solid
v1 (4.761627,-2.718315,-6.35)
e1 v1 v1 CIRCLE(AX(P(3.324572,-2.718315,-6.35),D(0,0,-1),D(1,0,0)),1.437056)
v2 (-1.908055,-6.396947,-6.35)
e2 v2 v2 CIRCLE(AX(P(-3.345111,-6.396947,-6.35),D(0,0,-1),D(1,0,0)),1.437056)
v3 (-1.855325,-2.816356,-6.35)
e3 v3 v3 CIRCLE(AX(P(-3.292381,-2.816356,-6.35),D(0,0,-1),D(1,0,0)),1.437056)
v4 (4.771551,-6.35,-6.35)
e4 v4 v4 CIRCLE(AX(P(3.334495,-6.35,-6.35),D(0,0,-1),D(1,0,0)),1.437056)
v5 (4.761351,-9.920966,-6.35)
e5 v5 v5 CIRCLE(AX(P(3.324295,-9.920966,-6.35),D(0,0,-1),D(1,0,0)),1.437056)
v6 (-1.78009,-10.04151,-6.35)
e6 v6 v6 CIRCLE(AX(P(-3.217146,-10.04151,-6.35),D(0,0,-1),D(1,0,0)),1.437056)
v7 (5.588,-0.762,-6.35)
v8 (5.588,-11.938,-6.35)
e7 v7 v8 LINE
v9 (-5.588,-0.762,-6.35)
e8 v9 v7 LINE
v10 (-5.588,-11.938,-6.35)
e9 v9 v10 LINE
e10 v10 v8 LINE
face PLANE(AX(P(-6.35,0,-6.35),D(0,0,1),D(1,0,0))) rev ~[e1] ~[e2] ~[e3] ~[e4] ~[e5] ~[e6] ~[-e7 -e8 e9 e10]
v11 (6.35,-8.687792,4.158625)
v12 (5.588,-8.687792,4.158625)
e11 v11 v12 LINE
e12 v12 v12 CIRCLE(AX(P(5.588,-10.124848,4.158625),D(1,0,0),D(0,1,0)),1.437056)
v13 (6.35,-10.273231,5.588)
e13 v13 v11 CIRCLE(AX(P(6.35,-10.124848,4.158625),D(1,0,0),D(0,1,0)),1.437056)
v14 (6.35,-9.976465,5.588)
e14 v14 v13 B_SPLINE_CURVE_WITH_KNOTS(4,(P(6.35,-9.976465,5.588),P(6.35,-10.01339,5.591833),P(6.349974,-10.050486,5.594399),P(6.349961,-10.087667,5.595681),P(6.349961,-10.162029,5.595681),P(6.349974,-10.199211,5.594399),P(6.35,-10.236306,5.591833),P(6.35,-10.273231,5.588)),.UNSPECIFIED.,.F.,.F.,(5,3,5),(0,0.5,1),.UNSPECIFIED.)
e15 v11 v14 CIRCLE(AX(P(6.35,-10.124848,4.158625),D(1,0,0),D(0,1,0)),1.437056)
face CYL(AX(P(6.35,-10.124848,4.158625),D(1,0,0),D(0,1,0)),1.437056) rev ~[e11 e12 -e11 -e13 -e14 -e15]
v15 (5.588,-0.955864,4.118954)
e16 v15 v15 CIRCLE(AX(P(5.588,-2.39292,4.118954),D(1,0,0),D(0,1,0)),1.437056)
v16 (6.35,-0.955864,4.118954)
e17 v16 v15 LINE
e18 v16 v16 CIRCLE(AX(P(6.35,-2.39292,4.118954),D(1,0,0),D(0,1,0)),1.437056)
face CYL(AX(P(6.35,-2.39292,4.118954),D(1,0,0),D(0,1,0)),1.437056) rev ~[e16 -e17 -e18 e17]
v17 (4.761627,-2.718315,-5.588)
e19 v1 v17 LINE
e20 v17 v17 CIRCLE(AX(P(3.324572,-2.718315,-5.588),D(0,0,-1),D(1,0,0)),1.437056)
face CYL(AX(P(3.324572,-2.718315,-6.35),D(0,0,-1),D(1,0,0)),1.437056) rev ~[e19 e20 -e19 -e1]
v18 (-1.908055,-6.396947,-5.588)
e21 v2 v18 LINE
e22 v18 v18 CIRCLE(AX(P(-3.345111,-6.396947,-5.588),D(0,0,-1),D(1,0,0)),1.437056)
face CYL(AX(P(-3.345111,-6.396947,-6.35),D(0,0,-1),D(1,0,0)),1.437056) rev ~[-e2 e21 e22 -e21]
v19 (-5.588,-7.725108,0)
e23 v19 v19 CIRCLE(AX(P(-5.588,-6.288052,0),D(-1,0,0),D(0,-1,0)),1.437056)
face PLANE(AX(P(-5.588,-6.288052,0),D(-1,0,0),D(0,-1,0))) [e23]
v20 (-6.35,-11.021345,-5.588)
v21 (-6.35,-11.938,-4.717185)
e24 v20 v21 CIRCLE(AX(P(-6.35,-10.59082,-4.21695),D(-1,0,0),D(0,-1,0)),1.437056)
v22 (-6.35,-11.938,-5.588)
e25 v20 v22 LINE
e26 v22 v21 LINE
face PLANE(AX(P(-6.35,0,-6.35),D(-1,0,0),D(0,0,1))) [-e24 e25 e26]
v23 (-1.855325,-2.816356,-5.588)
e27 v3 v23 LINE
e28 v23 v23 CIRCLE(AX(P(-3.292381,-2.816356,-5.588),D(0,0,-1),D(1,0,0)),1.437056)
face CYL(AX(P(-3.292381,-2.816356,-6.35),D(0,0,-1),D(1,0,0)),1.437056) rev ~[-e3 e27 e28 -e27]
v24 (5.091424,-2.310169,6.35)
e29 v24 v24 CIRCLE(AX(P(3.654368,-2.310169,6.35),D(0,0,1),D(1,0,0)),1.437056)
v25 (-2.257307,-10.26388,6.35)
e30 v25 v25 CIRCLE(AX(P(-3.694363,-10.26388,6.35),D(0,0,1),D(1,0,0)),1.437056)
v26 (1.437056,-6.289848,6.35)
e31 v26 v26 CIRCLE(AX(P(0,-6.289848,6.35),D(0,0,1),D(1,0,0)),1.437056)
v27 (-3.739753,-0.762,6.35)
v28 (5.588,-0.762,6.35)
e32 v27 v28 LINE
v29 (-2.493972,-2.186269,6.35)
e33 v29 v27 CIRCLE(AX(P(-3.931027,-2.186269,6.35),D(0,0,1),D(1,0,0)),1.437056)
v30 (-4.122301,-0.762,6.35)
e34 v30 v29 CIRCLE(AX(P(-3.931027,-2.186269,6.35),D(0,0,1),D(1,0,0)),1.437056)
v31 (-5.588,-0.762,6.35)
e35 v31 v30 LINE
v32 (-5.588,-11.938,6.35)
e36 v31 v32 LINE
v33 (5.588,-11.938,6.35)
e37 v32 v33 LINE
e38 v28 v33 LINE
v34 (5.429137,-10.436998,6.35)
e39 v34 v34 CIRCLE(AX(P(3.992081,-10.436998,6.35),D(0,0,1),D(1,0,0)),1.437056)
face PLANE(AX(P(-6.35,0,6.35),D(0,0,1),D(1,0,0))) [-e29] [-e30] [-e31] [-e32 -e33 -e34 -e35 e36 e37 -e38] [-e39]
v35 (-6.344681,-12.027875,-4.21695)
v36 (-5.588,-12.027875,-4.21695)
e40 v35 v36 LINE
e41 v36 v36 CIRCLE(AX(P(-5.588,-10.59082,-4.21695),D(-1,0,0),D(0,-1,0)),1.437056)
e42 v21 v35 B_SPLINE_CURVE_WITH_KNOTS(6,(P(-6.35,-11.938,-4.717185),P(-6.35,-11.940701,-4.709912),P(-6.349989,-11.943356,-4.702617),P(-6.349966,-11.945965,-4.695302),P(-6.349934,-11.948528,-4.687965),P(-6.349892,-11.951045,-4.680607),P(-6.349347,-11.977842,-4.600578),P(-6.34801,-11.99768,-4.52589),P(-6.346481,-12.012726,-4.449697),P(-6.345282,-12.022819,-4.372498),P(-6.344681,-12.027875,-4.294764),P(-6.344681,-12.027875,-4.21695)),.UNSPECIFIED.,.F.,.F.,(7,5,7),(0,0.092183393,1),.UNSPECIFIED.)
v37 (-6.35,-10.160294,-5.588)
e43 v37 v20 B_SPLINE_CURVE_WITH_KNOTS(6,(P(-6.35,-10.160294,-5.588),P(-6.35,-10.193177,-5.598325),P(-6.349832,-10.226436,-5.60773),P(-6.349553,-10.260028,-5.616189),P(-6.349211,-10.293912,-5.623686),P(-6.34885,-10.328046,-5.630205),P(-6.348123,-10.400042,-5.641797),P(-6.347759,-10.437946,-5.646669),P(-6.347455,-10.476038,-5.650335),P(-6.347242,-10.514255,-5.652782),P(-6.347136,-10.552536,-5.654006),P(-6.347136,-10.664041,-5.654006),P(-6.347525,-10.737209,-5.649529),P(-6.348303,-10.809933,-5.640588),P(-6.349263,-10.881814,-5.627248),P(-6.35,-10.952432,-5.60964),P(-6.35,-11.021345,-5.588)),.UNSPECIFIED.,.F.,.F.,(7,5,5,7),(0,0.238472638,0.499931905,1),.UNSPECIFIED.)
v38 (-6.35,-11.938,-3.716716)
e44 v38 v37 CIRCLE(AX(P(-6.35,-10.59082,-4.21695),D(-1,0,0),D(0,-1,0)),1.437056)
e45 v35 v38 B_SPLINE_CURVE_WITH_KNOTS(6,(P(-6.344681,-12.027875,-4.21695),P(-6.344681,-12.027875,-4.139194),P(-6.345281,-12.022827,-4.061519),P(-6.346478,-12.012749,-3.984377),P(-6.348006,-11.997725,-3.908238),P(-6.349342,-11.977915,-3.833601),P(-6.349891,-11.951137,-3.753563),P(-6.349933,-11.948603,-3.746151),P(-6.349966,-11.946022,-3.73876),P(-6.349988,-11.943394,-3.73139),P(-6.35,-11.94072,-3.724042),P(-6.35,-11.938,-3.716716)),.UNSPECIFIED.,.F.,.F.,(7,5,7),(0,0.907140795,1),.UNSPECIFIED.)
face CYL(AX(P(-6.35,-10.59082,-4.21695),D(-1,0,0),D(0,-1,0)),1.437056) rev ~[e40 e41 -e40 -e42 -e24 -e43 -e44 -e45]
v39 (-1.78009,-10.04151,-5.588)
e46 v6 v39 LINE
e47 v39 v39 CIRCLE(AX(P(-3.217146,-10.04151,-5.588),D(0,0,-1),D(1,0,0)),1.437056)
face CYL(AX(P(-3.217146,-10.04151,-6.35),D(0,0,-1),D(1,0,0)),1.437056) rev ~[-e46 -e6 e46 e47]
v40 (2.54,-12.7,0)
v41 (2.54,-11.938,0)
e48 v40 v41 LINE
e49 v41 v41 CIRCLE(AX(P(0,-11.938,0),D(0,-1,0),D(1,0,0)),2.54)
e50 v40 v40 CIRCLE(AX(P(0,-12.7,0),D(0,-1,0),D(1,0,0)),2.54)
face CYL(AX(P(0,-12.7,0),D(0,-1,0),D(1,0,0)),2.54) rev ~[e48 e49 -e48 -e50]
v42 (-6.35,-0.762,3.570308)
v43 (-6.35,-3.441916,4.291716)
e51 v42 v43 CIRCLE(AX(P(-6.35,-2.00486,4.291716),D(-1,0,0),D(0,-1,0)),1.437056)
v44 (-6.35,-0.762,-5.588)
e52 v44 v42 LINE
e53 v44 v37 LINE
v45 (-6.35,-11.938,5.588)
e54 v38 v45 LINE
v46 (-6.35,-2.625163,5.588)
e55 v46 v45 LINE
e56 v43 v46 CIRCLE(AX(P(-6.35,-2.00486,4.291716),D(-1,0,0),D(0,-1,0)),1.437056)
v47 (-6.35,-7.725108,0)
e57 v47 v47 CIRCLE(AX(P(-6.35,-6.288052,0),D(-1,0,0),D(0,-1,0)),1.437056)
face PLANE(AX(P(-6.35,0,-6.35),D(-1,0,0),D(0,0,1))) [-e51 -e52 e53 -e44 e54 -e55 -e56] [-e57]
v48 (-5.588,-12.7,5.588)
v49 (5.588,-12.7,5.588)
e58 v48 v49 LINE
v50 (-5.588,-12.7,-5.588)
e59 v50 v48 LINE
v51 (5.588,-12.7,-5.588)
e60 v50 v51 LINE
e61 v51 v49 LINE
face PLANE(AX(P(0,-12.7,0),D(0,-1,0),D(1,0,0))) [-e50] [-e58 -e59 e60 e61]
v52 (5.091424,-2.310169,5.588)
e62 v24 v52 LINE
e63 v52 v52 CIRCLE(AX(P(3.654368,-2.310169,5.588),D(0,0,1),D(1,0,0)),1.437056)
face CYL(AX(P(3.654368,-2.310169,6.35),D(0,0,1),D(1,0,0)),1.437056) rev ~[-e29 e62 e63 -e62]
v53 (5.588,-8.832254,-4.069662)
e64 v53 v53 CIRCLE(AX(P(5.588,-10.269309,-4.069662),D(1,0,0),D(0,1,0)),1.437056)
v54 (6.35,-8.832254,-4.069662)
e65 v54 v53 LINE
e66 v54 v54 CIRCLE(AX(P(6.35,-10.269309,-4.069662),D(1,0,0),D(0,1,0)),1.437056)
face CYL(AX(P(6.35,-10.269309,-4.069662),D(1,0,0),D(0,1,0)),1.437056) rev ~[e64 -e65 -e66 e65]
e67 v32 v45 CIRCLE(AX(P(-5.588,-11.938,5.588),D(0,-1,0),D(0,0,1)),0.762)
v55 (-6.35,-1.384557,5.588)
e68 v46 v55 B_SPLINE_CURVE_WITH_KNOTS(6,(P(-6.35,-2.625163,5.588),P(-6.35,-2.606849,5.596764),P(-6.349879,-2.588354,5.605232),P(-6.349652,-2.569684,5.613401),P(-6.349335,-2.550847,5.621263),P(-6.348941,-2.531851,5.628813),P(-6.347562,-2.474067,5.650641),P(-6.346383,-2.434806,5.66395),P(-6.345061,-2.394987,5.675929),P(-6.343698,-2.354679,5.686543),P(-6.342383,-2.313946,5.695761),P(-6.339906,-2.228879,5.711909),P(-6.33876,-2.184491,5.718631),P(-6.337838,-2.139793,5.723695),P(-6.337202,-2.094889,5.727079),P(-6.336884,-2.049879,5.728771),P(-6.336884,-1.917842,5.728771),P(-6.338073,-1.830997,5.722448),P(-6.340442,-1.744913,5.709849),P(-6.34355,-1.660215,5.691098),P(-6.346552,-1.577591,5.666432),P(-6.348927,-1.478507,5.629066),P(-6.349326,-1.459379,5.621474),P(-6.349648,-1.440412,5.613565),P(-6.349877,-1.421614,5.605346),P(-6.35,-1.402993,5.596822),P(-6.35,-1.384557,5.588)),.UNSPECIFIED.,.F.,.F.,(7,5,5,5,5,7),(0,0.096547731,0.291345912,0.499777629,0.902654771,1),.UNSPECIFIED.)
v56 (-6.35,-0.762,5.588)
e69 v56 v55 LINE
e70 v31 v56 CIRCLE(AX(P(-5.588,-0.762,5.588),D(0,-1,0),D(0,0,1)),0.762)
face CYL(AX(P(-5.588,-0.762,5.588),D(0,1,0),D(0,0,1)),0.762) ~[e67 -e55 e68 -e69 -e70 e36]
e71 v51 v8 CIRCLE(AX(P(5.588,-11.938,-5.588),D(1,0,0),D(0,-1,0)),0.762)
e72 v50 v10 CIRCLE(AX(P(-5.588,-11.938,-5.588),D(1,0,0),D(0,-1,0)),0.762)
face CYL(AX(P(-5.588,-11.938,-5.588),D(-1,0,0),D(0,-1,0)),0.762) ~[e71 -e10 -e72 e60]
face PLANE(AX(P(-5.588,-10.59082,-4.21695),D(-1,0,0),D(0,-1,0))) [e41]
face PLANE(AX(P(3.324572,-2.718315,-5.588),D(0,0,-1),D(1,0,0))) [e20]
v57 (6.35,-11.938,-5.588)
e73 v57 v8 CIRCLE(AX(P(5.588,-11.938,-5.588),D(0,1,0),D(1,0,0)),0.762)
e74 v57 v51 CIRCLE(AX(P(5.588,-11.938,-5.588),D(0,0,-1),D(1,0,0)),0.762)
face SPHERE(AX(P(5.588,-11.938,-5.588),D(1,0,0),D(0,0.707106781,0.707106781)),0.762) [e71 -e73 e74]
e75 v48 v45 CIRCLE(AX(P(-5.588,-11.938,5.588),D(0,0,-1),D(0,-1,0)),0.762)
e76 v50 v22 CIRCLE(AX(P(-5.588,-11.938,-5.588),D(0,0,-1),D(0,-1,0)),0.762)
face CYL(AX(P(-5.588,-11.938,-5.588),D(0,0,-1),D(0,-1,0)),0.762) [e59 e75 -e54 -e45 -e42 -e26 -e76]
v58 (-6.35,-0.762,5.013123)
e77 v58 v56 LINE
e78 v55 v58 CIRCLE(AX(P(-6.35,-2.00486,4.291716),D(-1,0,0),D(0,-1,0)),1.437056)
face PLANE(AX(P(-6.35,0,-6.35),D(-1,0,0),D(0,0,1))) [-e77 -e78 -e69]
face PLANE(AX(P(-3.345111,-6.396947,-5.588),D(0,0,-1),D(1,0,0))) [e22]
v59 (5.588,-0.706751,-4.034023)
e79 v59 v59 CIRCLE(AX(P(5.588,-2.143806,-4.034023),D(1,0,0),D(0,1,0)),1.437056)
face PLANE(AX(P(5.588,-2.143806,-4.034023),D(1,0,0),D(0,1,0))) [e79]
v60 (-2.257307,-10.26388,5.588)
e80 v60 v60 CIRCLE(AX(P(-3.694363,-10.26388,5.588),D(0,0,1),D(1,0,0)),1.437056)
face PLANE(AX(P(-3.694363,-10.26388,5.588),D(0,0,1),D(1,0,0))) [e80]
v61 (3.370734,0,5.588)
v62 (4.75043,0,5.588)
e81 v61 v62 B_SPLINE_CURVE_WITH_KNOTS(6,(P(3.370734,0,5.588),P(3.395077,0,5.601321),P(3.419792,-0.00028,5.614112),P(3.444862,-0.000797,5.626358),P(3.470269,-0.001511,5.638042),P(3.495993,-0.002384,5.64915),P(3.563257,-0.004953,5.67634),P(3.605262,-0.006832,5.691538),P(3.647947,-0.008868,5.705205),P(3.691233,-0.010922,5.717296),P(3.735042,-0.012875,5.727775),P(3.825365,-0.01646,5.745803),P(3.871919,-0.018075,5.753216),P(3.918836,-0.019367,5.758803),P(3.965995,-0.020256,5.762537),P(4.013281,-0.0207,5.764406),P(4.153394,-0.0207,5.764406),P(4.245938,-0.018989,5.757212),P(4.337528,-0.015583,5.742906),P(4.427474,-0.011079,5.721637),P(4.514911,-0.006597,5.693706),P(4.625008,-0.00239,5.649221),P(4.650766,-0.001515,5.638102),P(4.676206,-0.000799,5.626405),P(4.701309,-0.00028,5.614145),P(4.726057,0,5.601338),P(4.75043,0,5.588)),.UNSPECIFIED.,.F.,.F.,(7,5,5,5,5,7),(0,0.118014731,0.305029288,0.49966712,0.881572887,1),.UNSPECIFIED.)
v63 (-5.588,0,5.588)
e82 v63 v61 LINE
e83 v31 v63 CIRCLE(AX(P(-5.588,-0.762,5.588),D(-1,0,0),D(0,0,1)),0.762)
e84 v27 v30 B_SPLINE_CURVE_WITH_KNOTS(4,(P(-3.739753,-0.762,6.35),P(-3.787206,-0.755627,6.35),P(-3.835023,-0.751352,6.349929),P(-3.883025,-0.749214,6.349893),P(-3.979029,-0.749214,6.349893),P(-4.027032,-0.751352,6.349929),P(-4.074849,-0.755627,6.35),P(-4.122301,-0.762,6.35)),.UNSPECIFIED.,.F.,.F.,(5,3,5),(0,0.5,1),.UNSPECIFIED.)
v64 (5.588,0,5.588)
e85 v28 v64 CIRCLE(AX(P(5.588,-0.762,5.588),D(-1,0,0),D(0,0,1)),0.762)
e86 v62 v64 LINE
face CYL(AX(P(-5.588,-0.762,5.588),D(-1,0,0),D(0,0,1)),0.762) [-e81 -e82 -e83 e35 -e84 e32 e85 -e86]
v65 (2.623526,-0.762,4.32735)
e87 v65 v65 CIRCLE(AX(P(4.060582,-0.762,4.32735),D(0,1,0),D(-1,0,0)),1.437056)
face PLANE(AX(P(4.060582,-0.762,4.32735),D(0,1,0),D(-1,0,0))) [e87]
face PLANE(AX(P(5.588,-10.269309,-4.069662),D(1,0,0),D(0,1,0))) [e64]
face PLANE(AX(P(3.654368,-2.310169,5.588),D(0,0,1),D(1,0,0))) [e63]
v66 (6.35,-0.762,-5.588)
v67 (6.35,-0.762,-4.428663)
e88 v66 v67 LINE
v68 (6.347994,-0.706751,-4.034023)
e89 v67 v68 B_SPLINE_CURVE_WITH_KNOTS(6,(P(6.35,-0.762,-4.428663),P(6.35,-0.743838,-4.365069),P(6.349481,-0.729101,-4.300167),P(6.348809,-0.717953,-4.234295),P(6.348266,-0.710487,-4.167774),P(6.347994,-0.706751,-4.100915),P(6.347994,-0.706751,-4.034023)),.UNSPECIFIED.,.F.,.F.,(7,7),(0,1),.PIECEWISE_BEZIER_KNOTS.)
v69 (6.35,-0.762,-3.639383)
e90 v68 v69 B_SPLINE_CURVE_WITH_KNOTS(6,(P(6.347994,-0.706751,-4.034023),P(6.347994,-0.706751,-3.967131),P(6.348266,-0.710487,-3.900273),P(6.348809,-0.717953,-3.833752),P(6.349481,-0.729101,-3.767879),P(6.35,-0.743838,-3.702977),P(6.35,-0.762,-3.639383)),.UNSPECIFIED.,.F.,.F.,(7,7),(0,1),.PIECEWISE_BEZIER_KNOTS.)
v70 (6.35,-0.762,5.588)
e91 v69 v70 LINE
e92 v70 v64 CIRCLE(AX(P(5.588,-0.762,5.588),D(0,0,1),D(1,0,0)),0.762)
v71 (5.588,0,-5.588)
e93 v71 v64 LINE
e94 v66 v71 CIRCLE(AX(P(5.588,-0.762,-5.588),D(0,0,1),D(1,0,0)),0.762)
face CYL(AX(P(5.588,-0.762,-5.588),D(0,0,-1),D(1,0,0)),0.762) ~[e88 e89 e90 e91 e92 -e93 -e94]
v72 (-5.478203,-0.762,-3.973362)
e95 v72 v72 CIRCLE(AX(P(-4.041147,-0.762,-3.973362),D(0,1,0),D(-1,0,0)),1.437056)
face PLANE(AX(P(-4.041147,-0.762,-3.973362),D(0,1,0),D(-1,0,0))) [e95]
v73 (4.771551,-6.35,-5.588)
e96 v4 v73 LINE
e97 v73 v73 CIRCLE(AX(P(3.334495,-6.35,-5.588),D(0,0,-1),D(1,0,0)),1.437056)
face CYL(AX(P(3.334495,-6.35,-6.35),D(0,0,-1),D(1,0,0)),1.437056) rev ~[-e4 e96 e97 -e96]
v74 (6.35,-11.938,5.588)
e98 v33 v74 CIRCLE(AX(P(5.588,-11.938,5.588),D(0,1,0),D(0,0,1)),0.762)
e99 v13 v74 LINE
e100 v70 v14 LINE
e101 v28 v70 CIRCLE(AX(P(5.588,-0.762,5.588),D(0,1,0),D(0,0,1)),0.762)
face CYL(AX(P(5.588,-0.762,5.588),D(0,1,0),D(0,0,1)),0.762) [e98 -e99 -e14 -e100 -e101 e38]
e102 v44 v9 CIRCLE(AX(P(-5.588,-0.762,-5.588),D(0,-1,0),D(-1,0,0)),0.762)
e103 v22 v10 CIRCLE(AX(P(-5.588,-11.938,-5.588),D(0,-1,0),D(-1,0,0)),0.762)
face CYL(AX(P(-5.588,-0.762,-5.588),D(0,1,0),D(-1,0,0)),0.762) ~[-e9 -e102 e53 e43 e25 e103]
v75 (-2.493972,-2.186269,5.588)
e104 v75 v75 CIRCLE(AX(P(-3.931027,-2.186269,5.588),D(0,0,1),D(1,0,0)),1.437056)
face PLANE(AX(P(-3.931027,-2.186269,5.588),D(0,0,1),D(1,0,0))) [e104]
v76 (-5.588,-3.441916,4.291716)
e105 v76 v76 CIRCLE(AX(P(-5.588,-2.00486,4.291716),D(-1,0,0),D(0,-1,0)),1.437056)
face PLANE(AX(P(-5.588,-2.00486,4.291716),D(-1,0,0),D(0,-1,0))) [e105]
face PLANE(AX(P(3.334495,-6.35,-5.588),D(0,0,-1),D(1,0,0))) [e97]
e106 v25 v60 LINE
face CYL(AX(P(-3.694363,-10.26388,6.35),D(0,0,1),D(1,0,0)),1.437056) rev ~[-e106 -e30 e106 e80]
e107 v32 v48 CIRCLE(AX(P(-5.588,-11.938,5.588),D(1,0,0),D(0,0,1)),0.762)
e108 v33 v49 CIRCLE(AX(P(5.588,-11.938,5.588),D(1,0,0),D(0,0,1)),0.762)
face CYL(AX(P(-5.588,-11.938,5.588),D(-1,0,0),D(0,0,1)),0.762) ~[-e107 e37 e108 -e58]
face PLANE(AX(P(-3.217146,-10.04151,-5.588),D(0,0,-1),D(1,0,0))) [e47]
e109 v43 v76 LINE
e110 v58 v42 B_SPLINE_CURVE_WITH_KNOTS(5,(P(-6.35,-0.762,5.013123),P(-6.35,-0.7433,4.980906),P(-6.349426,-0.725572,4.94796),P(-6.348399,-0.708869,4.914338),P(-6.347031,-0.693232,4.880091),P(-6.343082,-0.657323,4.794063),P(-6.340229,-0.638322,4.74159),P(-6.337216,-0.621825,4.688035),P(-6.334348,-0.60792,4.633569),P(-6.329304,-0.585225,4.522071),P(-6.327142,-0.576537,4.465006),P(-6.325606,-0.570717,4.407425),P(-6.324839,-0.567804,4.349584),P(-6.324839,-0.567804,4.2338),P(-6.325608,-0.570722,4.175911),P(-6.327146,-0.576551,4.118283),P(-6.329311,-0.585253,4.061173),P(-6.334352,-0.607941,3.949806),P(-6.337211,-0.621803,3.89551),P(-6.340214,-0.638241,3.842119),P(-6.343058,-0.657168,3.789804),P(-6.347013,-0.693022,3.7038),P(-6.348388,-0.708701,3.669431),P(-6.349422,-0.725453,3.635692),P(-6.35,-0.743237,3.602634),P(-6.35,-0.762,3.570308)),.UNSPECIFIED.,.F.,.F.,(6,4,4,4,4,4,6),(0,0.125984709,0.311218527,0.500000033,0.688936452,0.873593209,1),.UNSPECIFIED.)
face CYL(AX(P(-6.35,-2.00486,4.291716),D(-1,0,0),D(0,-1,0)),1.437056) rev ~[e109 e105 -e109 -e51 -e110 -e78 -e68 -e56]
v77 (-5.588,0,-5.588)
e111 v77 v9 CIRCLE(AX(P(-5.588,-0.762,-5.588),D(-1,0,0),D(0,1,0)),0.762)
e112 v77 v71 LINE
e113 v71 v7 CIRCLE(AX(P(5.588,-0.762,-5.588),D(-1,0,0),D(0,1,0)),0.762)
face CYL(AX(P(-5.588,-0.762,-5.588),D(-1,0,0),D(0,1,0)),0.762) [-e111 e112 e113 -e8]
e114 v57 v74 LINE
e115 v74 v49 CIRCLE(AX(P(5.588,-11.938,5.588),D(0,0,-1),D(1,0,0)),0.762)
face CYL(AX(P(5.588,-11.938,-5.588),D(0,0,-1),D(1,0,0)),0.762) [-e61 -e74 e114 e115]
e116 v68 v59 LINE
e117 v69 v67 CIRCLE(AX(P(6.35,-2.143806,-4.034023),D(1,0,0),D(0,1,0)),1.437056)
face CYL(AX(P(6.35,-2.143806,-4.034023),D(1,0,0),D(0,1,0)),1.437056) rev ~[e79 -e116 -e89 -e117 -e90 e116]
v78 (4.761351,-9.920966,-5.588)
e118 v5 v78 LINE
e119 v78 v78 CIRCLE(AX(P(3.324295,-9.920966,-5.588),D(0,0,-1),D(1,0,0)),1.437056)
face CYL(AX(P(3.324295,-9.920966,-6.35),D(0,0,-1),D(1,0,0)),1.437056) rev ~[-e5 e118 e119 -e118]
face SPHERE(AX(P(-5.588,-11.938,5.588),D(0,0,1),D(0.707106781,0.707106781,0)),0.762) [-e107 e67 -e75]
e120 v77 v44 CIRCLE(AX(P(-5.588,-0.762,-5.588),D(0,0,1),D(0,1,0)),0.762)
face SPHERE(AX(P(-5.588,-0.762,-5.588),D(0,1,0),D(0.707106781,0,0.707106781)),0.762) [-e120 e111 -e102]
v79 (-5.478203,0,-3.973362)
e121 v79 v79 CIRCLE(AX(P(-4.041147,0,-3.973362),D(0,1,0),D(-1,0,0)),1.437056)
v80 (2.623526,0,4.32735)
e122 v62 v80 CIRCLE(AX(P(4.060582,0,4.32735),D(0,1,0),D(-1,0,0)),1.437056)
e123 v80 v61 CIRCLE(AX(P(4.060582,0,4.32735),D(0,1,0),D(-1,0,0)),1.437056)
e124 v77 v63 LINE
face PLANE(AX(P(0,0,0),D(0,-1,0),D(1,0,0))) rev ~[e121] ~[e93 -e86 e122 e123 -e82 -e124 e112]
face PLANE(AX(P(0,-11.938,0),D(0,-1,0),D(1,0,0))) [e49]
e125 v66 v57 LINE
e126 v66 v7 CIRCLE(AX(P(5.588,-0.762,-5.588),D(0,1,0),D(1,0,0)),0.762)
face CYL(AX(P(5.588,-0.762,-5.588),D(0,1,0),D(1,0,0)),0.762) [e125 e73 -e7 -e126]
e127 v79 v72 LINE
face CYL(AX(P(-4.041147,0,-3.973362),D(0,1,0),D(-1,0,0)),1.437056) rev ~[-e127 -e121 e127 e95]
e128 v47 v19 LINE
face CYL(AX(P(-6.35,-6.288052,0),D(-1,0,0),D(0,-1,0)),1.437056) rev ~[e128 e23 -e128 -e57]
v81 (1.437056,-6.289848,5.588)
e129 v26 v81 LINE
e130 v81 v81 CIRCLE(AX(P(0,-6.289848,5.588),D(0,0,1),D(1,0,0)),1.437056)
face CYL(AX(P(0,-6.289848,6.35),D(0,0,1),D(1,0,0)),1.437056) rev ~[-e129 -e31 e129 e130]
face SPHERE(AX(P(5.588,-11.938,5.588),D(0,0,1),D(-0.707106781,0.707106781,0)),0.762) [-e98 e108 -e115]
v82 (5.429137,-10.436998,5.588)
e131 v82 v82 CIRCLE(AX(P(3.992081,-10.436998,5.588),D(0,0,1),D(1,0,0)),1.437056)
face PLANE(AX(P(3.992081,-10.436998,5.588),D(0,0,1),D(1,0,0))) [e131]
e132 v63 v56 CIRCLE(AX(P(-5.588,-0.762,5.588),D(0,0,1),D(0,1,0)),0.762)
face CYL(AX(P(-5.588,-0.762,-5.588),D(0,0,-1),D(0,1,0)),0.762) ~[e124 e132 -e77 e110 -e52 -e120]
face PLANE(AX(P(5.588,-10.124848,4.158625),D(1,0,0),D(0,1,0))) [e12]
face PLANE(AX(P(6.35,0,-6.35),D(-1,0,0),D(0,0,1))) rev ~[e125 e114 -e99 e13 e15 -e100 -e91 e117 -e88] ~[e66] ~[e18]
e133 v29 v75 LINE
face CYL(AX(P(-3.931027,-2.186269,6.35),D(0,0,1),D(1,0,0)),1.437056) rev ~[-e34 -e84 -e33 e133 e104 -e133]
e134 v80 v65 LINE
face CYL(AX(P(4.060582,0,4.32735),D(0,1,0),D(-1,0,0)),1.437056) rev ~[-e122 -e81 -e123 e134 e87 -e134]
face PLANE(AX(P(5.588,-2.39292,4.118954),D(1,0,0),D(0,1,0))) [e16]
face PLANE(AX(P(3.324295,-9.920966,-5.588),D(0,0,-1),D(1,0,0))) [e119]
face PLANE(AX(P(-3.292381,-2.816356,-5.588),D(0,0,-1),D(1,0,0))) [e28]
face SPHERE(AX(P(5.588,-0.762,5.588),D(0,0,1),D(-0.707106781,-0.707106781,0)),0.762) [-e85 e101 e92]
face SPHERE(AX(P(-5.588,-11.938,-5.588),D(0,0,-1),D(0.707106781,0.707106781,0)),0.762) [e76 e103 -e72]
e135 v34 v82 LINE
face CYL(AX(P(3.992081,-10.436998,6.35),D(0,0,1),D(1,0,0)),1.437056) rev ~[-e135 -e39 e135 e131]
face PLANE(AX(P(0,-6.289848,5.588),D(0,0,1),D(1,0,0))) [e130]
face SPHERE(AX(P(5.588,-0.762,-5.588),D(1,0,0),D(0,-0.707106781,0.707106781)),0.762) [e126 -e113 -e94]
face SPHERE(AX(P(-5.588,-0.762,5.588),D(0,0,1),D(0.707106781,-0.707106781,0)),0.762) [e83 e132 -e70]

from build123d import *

# Parameters (mm, degrees)
F0_W          = 12.7
F0_H          = 12.7
F1_DEPTH      = 12.7
F2_R          = 2.54
F3_DEPTH      = 0.762
F4_R          = 1.4370558
F5_DEPTH      = 0.762
F6_R          = 1.4370558
F7_DEPTH      = 0.762
F8_R          = 1.4370558
F9_DEPTH      = 0.762
F10_R         = 1.4370558
F11_DEPTH     = 0.762
F12_T1_DEPTH  = 11.176
F12_T3_DEPTH  = 11.176
F12_T5_DEPTH  = 11.176
F12_S9_W      = 0.762
F12_S9_H      = 0.762
F12_T10_DEPTH = 0.762
F12_S15_W     = 0.762
F12_S15_H     = 0.762
F12_T16_DEPTH = 0.762
F12_S21_W     = 0.762
F12_S21_H     = 0.762
F12_T22_DEPTH = 0.762
F12_S27_W     = 0.762
F12_S27_H     = 0.762
F12_T28_DEPTH = 0.762
F12_S33_W     = 0.762
F12_S33_H     = 0.762
F12_T34_DEPTH = 0.762
F12_S39_W     = 0.762
F12_S39_H     = 0.762
F12_T40_DEPTH = 0.762
F12_S45_W     = 0.762
F12_S45_H     = 0.762
F12_T46_DEPTH = 0.762
F12_S51_W     = 0.762
F12_S51_H     = 0.762
F12_T52_DEPTH = 0.762
F13_R         = 1.4370558
F14_DEPTH     = 0.762


# Not quite as in the source:
# - a fillet or chamfer that OpenCascade refuses, or shapes differently, is made with other operations: its cross-section is extruded or revolved along the edge and cut away or added


with BuildPart() as f1:
    # F0 (on Front) → F1 (new body)
    with BuildSketch(Plane.XZ):
        Rectangle(F0_W, F0_H)
    extrude(amount=F1_DEPTH)

    # F2 (on face) → F3 (cut)
    with BuildSketch(Plane.XZ.offset(12.7)):
        Circle(F2_R)
    extrude(amount=-F3_DEPTH, mode=Mode.SUBTRACT)

    # F4 (on face) → F5 (cut)
    with BuildSketch(Plane(origin=(0, 0, 0), x_dir=(-1, 0, 0), z_dir=(0, 1, 0))):
        with Locations((-4.0605822578, 4.3273498304)):
            Circle(F4_R)
        with Locations((4.0411474183, -3.9733615704)):
            Circle(F4_R)
    extrude(amount=-F5_DEPTH, mode=Mode.SUBTRACT)

    # F6 (on face) → F7 (cut)
    with BuildSketch(Plane(origin=(-6.35, 0, 0), x_dir=(0, -1, 0), z_dir=(-1, 0, 0))):
        with Locations((6.2880520709, 0)):
            Circle(F6_R)
        with Locations((10.5908196419, -4.2169503868)):
            Circle(F6_R)
        with Locations((2.0048597362, 4.2917155661)):
            Circle(F6_R)
    extrude(amount=-F7_DEPTH, mode=Mode.SUBTRACT)

    # F8 (on face) → F9 (cut)
    with BuildSketch(Plane.YZ.offset(6.35)):
        with Locations((-10.1248482242, 4.1586253792)):
            Circle(F8_R)
        with Locations((-2.3929197341, 4.1189542972)):
            Circle(F8_R)
        with Locations((-10.2693093941, -4.0696617216)):
            Circle(F8_R)
        with Locations((-2.1438063122, -4.0340232663)):
            Circle(F8_R)
    extrude(amount=-F9_DEPTH, mode=Mode.SUBTRACT)

    # F10 (on face) → F11 (cut)
    with BuildSketch(Plane.XY.offset(6.35)):
        with Locations((0, -6.2898481265)):
            Circle(F10_R)
        with Locations((3.6543684546, -2.3101689294)):
            Circle(F10_R)
        with Locations((-3.9310273714, -2.1862694994)):
            Circle(F10_R)
        with Locations((-3.6943627056, -10.2638797835)):
            Circle(F10_R)
        with Locations((3.9920811541, -10.4369977489)):
            Circle(F10_R)
    extrude(amount=-F11_DEPTH, mode=Mode.SUBTRACT)

    # F12: fillet of radius 0.762 on 12 edges, made by hand

    # F12_s2 → F12_t1 (cut)
    with BuildSketch(Plane.YZ.offset(-5.588)):
        with BuildLine():
            ThreePointArc((-11.938, 6.35), (-12.4768153673, 6.1268153673), (-12.7, 5.588))
            Line((-12.7, 5.588), (-12.7, 6.35))
            Line((-12.7, 6.35), (-11.938, 6.35))
        make_face()
        with BuildLine():
            ThreePointArc((-0.762, 6.35), (-0.2231846327, 6.1268153673), (0, 5.588))
            Line((0, 5.588), (0, 6.35))
            Line((0, 6.35), (-0.762, 6.35))
        make_face()
        with BuildLine():
            ThreePointArc((-12.7, -5.588), (-12.4768153673, -6.1268153673), (-11.938, -6.35))
            Line((-11.938, -6.35), (-12.7, -6.35))
            Line((-12.7, -6.35), (-12.7, -5.588))
        make_face()
        with BuildLine():
            ThreePointArc((0, -5.588), (-0.2231846327, -6.1268153673), (-0.762, -6.35))
            Line((-0.762, -6.35), (0, -6.35))
            Line((0, -6.35), (0, -5.588))
        make_face()
    extrude(amount=F12_T1_DEPTH, mode=Mode.SUBTRACT)

    # F12_s4 → F12_t3 (cut)
    with BuildSketch(Plane.XZ.offset(0.762)):
        with BuildLine():
            ThreePointArc((-5.588, 6.35), (-6.1268153673, 6.1268153673), (-6.35, 5.588))
            Line((-6.35, 5.588), (-6.35, 6.35))
            Line((-6.35, 6.35), (-5.588, 6.35))
        make_face()
        with BuildLine():
            ThreePointArc((5.588, 6.35), (6.1268153673, 6.1268153673), (6.35, 5.588))
            Line((6.35, 5.588), (6.35, 6.35))
            Line((6.35, 6.35), (5.588, 6.35))
        make_face()
        with BuildLine():
            ThreePointArc((6.35, -5.588), (6.1268153673, -6.1268153673), (5.588, -6.35))
            Line((5.588, -6.35), (6.35, -6.35))
            Line((6.35, -6.35), (6.35, -5.588))
        make_face()
        with BuildLine():
            ThreePointArc((-6.35, -5.588), (-6.1268153673, -6.1268153673), (-5.588, -6.35))
            Line((-5.588, -6.35), (-6.35, -6.35))
            Line((-6.35, -6.35), (-6.35, -5.588))
        make_face()
    extrude(amount=F12_T3_DEPTH, mode=Mode.SUBTRACT)

    # F12_s6 → F12_t5 (cut)
    with BuildSketch(Plane.XY.offset(-5.588)):
        with BuildLine():
            ThreePointArc((6.35, -11.938), (6.1268153673, -12.4768153673), (5.588, -12.7))
            Line((5.588, -12.7), (6.35, -12.7))
            Line((6.35, -12.7), (6.35, -11.938))
        make_face()
        with BuildLine():
            ThreePointArc((-5.588, -12.7), (-6.1268153673, -12.4768153673), (-6.35, -11.938))
            Line((-6.35, -11.938), (-6.35, -12.7))
            Line((-6.35, -12.7), (-5.588, -12.7))
        make_face()
        with BuildLine():
            ThreePointArc((6.35, -0.762), (6.1268153673, -0.2231846327), (5.588, 0))
            Line((5.588, 0), (6.35, 0))
            Line((6.35, 0), (6.35, -0.762))
        make_face()
        with BuildLine():
            ThreePointArc((-5.588, 0), (-6.1268153673, -0.2231846327), (-6.35, -0.762))
            Line((-6.35, -0.762), (-6.35, 0))
            Line((-6.35, 0), (-5.588, 0))
        make_face()
    extrude(amount=F12_T5_DEPTH, mode=Mode.SUBTRACT)


with BuildPart() as f12_tool8:
    # F12_s9 → F12_t10 (new body)
    with BuildSketch(Plane.XY.offset(5.588)):
        with Locations((5.969, -12.319)):
            Rectangle(F12_S9_W, F12_S9_H)
    extrude(amount=F12_T10_DEPTH)

    # F12_s11 → F12_t12 (revolve, cut)
    with BuildSketch(Plane(origin=(5.588, -11.938, 5.588), x_dir=(-0.7071067812, 0.7071067812, 0), z_dir=(0.7071067812, 0.7071067812, 0))):
        with BuildLine():
            ThreePointArc((0, -0.762), (0.762, 0), (0, 0.762))
            Line((0, 0.762), (0, -0.762))
        make_face()
    revolve(axis=Axis((5.588, -11.938, 5.588), (0, 0, 1)), mode=Mode.SUBTRACT)


with BuildPart() as f1_1:
    add(f1.part)

    # F12_t7: cut F12_tool8
    add(f12_tool8.part, mode=Mode.SUBTRACT)


with BuildPart() as f12_tool14:
    # F12_s15 → F12_t16 (new body)
    with BuildSketch(Plane.XY.offset(5.588)):
        with Locations((-5.969, -12.319)):
            Rectangle(F12_S15_W, F12_S15_H)
    extrude(amount=F12_T16_DEPTH)

    # F12_s17 → F12_t18 (revolve, cut)
    with BuildSketch(Plane(origin=(-5.588, -11.938, 5.588), x_dir=(0.7071067812, 0.7071067812, 0), z_dir=(0.7071067812, -0.7071067812, 0))):
        with BuildLine():
            ThreePointArc((0, -0.762), (0.762, 0), (0, 0.762))
            Line((0, 0.762), (0, -0.762))
        make_face()
    revolve(axis=Axis((-5.588, -11.938, 5.588), (0, 0, 1)), mode=Mode.SUBTRACT)


with BuildPart() as f1_2:
    add(f1_1.part)

    # F12_t13: cut F12_tool14
    add(f12_tool14.part, mode=Mode.SUBTRACT)


with BuildPart() as f12_tool20:
    # F12_s21 → F12_t22 (new body)
    with BuildSketch(Plane.XY.offset(5.588)):
        with Locations((-5.969, -0.381)):
            Rectangle(F12_S21_W, F12_S21_H)
    extrude(amount=F12_T22_DEPTH)

    # F12_s23 → F12_t24 (revolve, cut)
    with BuildSketch(Plane(origin=(-5.588, -0.762, 5.588), x_dir=(0.7071067812, -0.7071067812, 0), z_dir=(-0.7071067812, -0.7071067812, 0))):
        with BuildLine():
            ThreePointArc((0, -0.762), (0.762, 0), (0, 0.762))
            Line((0, 0.762), (0, -0.762))
        make_face()
    revolve(axis=Axis((-5.588, -0.762, 5.588), (0, 0, 1)), mode=Mode.SUBTRACT)


with BuildPart() as f1_3:
    add(f1_2.part)

    # F12_t19: cut F12_tool20
    add(f12_tool20.part, mode=Mode.SUBTRACT)


with BuildPart() as f12_tool26:
    # F12_s27 → F12_t28 (new body)
    with BuildSketch(Plane.XY.offset(5.588)):
        with Locations((5.969, -0.381)):
            Rectangle(F12_S27_W, F12_S27_H)
    extrude(amount=F12_T28_DEPTH)

    # F12_s29 → F12_t30 (revolve, cut)
    with BuildSketch(Plane(origin=(5.588, -0.762, 5.588), x_dir=(-0.7071067812, -0.7071067812, 0), z_dir=(-0.7071067812, 0.7071067812, 0))):
        with BuildLine():
            ThreePointArc((0, -0.762), (0.762, 0), (0, 0.762))
            Line((0, 0.762), (0, -0.762))
        make_face()
    revolve(axis=Axis((5.588, -0.762, 5.588), (0, 0, 1)), mode=Mode.SUBTRACT)


with BuildPart() as f1_4:
    add(f1_3.part)

    # F12_t25: cut F12_tool26
    add(f12_tool26.part, mode=Mode.SUBTRACT)


with BuildPart() as f12_tool32:
    # F12_s33 → F12_t34 (new body)
    with BuildSketch(Plane.YZ.offset(5.588)):
        with Locations((-12.319, -5.969)):
            Rectangle(F12_S33_W, F12_S33_H)
    extrude(amount=F12_T34_DEPTH)

    # F12_s35 → F12_t36 (revolve, cut)
    with BuildSketch(Plane(origin=(5.588, -11.938, -5.588), x_dir=(0, 0.7071067812, 0.7071067812), z_dir=(0, 0.7071067812, -0.7071067812))):
        with BuildLine():
            ThreePointArc((0, -0.762), (0.762, 0), (0, 0.762))
            Line((0, 0.762), (0, -0.762))
        make_face()
    revolve(axis=Axis((5.588, -11.938, -5.588), (1, 0, 0)), mode=Mode.SUBTRACT)


with BuildPart() as f1_5:
    add(f1_4.part)

    # F12_t31: cut F12_tool32
    add(f12_tool32.part, mode=Mode.SUBTRACT)


with BuildPart() as f12_tool38:
    # F12_s39 → F12_t40 (new body)
    with BuildSketch(Plane.XY.offset(-5.588)):
        with Locations((-5.969, -12.319)):
            Rectangle(F12_S39_W, F12_S39_H)
    extrude(amount=-F12_T40_DEPTH)

    # F12_s41 → F12_t42 (revolve, cut)
    with BuildSketch(Plane(origin=(-5.588, -11.938, -5.588), x_dir=(0.7071067812, 0.7071067812, 0), z_dir=(-0.7071067812, 0.7071067812, 0))):
        with BuildLine():
            ThreePointArc((0, -0.762), (0.762, 0), (0, 0.762))
            Line((0, 0.762), (0, -0.762))
        make_face()
    revolve(axis=Axis((-5.588, -11.938, -5.588), (0, 0, -1)), mode=Mode.SUBTRACT)


with BuildPart() as f1_6:
    add(f1_5.part)

    # F12_t37: cut F12_tool38
    add(f12_tool38.part, mode=Mode.SUBTRACT)


with BuildPart() as f12_tool44:
    # F12_s45 → F12_t46 (new body)
    with BuildSketch(Plane.YZ.offset(5.588)):
        with Locations((-0.381, -5.969)):
            Rectangle(F12_S45_W, F12_S45_H)
    extrude(amount=F12_T46_DEPTH)

    # F12_s47 → F12_t48 (revolve, cut)
    with BuildSketch(Plane(origin=(5.588, -0.762, -5.588), x_dir=(0, -0.7071067812, 0.7071067812), z_dir=(0, 0.7071067812, 0.7071067812))):
        with BuildLine():
            ThreePointArc((0, -0.762), (0.762, 0), (0, 0.762))
            Line((0, 0.762), (0, -0.762))
        make_face()
    revolve(axis=Axis((5.588, -0.762, -5.588), (1, 0, 0)), mode=Mode.SUBTRACT)


with BuildPart() as f1_7:
    add(f1_6.part)

    # F12_t43: cut F12_tool44
    add(f12_tool44.part, mode=Mode.SUBTRACT)


with BuildPart() as f12_tool50:
    # F12_s51 → F12_t52 (new body)
    with BuildSketch(Plane.XZ.offset(0.762)):
        with Locations((-5.969, -5.969)):
            Rectangle(F12_S51_W, F12_S51_H)
    extrude(amount=-F12_T52_DEPTH)

    # F12_s53 → F12_t54 (revolve, cut)
    with BuildSketch(Plane(origin=(-5.588, -0.762, -5.588), x_dir=(0.7071067812, 0, 0.7071067812), z_dir=(-0.7071067812, 0, 0.7071067812))):
        with BuildLine():
            ThreePointArc((0, -0.762), (0.762, 0), (0, 0.762))
            Line((0, 0.762), (0, -0.762))
        make_face()
    revolve(axis=Axis((-5.588, -0.762, -5.588), (0, 1, 0)), mode=Mode.SUBTRACT)


with BuildPart() as f1_8:
    add(f1_7.part)

    # F12_t49: cut F12_tool50
    add(f12_tool50.part, mode=Mode.SUBTRACT)

    # F13 (on face) → F14 (cut)
    with BuildSketch(Plane(origin=(0, 0, -6.35), x_dir=(1, 0, 0), z_dir=(0, 0, -1))):
        with Locations((3.3344947733, 6.35)):
            Circle(F13_R)
        with Locations((3.3242953941, 9.9209658802)):
            Circle(F13_R)
        with Locations((3.3245715313, 2.7183145285)):
            Circle(F13_R)
        with Locations((-3.2171458006, 10.041509755)):
            Circle(F13_R)
        with Locations((-3.3451111522, 6.3969474286)):
            Circle(F13_R)
        with Locations((-3.2923812978, 2.8163562529)):
            Circle(F13_R)
    extrude(amount=-F14_DEPTH, mode=Mode.SUBTRACT)


solid = f1_8.part
